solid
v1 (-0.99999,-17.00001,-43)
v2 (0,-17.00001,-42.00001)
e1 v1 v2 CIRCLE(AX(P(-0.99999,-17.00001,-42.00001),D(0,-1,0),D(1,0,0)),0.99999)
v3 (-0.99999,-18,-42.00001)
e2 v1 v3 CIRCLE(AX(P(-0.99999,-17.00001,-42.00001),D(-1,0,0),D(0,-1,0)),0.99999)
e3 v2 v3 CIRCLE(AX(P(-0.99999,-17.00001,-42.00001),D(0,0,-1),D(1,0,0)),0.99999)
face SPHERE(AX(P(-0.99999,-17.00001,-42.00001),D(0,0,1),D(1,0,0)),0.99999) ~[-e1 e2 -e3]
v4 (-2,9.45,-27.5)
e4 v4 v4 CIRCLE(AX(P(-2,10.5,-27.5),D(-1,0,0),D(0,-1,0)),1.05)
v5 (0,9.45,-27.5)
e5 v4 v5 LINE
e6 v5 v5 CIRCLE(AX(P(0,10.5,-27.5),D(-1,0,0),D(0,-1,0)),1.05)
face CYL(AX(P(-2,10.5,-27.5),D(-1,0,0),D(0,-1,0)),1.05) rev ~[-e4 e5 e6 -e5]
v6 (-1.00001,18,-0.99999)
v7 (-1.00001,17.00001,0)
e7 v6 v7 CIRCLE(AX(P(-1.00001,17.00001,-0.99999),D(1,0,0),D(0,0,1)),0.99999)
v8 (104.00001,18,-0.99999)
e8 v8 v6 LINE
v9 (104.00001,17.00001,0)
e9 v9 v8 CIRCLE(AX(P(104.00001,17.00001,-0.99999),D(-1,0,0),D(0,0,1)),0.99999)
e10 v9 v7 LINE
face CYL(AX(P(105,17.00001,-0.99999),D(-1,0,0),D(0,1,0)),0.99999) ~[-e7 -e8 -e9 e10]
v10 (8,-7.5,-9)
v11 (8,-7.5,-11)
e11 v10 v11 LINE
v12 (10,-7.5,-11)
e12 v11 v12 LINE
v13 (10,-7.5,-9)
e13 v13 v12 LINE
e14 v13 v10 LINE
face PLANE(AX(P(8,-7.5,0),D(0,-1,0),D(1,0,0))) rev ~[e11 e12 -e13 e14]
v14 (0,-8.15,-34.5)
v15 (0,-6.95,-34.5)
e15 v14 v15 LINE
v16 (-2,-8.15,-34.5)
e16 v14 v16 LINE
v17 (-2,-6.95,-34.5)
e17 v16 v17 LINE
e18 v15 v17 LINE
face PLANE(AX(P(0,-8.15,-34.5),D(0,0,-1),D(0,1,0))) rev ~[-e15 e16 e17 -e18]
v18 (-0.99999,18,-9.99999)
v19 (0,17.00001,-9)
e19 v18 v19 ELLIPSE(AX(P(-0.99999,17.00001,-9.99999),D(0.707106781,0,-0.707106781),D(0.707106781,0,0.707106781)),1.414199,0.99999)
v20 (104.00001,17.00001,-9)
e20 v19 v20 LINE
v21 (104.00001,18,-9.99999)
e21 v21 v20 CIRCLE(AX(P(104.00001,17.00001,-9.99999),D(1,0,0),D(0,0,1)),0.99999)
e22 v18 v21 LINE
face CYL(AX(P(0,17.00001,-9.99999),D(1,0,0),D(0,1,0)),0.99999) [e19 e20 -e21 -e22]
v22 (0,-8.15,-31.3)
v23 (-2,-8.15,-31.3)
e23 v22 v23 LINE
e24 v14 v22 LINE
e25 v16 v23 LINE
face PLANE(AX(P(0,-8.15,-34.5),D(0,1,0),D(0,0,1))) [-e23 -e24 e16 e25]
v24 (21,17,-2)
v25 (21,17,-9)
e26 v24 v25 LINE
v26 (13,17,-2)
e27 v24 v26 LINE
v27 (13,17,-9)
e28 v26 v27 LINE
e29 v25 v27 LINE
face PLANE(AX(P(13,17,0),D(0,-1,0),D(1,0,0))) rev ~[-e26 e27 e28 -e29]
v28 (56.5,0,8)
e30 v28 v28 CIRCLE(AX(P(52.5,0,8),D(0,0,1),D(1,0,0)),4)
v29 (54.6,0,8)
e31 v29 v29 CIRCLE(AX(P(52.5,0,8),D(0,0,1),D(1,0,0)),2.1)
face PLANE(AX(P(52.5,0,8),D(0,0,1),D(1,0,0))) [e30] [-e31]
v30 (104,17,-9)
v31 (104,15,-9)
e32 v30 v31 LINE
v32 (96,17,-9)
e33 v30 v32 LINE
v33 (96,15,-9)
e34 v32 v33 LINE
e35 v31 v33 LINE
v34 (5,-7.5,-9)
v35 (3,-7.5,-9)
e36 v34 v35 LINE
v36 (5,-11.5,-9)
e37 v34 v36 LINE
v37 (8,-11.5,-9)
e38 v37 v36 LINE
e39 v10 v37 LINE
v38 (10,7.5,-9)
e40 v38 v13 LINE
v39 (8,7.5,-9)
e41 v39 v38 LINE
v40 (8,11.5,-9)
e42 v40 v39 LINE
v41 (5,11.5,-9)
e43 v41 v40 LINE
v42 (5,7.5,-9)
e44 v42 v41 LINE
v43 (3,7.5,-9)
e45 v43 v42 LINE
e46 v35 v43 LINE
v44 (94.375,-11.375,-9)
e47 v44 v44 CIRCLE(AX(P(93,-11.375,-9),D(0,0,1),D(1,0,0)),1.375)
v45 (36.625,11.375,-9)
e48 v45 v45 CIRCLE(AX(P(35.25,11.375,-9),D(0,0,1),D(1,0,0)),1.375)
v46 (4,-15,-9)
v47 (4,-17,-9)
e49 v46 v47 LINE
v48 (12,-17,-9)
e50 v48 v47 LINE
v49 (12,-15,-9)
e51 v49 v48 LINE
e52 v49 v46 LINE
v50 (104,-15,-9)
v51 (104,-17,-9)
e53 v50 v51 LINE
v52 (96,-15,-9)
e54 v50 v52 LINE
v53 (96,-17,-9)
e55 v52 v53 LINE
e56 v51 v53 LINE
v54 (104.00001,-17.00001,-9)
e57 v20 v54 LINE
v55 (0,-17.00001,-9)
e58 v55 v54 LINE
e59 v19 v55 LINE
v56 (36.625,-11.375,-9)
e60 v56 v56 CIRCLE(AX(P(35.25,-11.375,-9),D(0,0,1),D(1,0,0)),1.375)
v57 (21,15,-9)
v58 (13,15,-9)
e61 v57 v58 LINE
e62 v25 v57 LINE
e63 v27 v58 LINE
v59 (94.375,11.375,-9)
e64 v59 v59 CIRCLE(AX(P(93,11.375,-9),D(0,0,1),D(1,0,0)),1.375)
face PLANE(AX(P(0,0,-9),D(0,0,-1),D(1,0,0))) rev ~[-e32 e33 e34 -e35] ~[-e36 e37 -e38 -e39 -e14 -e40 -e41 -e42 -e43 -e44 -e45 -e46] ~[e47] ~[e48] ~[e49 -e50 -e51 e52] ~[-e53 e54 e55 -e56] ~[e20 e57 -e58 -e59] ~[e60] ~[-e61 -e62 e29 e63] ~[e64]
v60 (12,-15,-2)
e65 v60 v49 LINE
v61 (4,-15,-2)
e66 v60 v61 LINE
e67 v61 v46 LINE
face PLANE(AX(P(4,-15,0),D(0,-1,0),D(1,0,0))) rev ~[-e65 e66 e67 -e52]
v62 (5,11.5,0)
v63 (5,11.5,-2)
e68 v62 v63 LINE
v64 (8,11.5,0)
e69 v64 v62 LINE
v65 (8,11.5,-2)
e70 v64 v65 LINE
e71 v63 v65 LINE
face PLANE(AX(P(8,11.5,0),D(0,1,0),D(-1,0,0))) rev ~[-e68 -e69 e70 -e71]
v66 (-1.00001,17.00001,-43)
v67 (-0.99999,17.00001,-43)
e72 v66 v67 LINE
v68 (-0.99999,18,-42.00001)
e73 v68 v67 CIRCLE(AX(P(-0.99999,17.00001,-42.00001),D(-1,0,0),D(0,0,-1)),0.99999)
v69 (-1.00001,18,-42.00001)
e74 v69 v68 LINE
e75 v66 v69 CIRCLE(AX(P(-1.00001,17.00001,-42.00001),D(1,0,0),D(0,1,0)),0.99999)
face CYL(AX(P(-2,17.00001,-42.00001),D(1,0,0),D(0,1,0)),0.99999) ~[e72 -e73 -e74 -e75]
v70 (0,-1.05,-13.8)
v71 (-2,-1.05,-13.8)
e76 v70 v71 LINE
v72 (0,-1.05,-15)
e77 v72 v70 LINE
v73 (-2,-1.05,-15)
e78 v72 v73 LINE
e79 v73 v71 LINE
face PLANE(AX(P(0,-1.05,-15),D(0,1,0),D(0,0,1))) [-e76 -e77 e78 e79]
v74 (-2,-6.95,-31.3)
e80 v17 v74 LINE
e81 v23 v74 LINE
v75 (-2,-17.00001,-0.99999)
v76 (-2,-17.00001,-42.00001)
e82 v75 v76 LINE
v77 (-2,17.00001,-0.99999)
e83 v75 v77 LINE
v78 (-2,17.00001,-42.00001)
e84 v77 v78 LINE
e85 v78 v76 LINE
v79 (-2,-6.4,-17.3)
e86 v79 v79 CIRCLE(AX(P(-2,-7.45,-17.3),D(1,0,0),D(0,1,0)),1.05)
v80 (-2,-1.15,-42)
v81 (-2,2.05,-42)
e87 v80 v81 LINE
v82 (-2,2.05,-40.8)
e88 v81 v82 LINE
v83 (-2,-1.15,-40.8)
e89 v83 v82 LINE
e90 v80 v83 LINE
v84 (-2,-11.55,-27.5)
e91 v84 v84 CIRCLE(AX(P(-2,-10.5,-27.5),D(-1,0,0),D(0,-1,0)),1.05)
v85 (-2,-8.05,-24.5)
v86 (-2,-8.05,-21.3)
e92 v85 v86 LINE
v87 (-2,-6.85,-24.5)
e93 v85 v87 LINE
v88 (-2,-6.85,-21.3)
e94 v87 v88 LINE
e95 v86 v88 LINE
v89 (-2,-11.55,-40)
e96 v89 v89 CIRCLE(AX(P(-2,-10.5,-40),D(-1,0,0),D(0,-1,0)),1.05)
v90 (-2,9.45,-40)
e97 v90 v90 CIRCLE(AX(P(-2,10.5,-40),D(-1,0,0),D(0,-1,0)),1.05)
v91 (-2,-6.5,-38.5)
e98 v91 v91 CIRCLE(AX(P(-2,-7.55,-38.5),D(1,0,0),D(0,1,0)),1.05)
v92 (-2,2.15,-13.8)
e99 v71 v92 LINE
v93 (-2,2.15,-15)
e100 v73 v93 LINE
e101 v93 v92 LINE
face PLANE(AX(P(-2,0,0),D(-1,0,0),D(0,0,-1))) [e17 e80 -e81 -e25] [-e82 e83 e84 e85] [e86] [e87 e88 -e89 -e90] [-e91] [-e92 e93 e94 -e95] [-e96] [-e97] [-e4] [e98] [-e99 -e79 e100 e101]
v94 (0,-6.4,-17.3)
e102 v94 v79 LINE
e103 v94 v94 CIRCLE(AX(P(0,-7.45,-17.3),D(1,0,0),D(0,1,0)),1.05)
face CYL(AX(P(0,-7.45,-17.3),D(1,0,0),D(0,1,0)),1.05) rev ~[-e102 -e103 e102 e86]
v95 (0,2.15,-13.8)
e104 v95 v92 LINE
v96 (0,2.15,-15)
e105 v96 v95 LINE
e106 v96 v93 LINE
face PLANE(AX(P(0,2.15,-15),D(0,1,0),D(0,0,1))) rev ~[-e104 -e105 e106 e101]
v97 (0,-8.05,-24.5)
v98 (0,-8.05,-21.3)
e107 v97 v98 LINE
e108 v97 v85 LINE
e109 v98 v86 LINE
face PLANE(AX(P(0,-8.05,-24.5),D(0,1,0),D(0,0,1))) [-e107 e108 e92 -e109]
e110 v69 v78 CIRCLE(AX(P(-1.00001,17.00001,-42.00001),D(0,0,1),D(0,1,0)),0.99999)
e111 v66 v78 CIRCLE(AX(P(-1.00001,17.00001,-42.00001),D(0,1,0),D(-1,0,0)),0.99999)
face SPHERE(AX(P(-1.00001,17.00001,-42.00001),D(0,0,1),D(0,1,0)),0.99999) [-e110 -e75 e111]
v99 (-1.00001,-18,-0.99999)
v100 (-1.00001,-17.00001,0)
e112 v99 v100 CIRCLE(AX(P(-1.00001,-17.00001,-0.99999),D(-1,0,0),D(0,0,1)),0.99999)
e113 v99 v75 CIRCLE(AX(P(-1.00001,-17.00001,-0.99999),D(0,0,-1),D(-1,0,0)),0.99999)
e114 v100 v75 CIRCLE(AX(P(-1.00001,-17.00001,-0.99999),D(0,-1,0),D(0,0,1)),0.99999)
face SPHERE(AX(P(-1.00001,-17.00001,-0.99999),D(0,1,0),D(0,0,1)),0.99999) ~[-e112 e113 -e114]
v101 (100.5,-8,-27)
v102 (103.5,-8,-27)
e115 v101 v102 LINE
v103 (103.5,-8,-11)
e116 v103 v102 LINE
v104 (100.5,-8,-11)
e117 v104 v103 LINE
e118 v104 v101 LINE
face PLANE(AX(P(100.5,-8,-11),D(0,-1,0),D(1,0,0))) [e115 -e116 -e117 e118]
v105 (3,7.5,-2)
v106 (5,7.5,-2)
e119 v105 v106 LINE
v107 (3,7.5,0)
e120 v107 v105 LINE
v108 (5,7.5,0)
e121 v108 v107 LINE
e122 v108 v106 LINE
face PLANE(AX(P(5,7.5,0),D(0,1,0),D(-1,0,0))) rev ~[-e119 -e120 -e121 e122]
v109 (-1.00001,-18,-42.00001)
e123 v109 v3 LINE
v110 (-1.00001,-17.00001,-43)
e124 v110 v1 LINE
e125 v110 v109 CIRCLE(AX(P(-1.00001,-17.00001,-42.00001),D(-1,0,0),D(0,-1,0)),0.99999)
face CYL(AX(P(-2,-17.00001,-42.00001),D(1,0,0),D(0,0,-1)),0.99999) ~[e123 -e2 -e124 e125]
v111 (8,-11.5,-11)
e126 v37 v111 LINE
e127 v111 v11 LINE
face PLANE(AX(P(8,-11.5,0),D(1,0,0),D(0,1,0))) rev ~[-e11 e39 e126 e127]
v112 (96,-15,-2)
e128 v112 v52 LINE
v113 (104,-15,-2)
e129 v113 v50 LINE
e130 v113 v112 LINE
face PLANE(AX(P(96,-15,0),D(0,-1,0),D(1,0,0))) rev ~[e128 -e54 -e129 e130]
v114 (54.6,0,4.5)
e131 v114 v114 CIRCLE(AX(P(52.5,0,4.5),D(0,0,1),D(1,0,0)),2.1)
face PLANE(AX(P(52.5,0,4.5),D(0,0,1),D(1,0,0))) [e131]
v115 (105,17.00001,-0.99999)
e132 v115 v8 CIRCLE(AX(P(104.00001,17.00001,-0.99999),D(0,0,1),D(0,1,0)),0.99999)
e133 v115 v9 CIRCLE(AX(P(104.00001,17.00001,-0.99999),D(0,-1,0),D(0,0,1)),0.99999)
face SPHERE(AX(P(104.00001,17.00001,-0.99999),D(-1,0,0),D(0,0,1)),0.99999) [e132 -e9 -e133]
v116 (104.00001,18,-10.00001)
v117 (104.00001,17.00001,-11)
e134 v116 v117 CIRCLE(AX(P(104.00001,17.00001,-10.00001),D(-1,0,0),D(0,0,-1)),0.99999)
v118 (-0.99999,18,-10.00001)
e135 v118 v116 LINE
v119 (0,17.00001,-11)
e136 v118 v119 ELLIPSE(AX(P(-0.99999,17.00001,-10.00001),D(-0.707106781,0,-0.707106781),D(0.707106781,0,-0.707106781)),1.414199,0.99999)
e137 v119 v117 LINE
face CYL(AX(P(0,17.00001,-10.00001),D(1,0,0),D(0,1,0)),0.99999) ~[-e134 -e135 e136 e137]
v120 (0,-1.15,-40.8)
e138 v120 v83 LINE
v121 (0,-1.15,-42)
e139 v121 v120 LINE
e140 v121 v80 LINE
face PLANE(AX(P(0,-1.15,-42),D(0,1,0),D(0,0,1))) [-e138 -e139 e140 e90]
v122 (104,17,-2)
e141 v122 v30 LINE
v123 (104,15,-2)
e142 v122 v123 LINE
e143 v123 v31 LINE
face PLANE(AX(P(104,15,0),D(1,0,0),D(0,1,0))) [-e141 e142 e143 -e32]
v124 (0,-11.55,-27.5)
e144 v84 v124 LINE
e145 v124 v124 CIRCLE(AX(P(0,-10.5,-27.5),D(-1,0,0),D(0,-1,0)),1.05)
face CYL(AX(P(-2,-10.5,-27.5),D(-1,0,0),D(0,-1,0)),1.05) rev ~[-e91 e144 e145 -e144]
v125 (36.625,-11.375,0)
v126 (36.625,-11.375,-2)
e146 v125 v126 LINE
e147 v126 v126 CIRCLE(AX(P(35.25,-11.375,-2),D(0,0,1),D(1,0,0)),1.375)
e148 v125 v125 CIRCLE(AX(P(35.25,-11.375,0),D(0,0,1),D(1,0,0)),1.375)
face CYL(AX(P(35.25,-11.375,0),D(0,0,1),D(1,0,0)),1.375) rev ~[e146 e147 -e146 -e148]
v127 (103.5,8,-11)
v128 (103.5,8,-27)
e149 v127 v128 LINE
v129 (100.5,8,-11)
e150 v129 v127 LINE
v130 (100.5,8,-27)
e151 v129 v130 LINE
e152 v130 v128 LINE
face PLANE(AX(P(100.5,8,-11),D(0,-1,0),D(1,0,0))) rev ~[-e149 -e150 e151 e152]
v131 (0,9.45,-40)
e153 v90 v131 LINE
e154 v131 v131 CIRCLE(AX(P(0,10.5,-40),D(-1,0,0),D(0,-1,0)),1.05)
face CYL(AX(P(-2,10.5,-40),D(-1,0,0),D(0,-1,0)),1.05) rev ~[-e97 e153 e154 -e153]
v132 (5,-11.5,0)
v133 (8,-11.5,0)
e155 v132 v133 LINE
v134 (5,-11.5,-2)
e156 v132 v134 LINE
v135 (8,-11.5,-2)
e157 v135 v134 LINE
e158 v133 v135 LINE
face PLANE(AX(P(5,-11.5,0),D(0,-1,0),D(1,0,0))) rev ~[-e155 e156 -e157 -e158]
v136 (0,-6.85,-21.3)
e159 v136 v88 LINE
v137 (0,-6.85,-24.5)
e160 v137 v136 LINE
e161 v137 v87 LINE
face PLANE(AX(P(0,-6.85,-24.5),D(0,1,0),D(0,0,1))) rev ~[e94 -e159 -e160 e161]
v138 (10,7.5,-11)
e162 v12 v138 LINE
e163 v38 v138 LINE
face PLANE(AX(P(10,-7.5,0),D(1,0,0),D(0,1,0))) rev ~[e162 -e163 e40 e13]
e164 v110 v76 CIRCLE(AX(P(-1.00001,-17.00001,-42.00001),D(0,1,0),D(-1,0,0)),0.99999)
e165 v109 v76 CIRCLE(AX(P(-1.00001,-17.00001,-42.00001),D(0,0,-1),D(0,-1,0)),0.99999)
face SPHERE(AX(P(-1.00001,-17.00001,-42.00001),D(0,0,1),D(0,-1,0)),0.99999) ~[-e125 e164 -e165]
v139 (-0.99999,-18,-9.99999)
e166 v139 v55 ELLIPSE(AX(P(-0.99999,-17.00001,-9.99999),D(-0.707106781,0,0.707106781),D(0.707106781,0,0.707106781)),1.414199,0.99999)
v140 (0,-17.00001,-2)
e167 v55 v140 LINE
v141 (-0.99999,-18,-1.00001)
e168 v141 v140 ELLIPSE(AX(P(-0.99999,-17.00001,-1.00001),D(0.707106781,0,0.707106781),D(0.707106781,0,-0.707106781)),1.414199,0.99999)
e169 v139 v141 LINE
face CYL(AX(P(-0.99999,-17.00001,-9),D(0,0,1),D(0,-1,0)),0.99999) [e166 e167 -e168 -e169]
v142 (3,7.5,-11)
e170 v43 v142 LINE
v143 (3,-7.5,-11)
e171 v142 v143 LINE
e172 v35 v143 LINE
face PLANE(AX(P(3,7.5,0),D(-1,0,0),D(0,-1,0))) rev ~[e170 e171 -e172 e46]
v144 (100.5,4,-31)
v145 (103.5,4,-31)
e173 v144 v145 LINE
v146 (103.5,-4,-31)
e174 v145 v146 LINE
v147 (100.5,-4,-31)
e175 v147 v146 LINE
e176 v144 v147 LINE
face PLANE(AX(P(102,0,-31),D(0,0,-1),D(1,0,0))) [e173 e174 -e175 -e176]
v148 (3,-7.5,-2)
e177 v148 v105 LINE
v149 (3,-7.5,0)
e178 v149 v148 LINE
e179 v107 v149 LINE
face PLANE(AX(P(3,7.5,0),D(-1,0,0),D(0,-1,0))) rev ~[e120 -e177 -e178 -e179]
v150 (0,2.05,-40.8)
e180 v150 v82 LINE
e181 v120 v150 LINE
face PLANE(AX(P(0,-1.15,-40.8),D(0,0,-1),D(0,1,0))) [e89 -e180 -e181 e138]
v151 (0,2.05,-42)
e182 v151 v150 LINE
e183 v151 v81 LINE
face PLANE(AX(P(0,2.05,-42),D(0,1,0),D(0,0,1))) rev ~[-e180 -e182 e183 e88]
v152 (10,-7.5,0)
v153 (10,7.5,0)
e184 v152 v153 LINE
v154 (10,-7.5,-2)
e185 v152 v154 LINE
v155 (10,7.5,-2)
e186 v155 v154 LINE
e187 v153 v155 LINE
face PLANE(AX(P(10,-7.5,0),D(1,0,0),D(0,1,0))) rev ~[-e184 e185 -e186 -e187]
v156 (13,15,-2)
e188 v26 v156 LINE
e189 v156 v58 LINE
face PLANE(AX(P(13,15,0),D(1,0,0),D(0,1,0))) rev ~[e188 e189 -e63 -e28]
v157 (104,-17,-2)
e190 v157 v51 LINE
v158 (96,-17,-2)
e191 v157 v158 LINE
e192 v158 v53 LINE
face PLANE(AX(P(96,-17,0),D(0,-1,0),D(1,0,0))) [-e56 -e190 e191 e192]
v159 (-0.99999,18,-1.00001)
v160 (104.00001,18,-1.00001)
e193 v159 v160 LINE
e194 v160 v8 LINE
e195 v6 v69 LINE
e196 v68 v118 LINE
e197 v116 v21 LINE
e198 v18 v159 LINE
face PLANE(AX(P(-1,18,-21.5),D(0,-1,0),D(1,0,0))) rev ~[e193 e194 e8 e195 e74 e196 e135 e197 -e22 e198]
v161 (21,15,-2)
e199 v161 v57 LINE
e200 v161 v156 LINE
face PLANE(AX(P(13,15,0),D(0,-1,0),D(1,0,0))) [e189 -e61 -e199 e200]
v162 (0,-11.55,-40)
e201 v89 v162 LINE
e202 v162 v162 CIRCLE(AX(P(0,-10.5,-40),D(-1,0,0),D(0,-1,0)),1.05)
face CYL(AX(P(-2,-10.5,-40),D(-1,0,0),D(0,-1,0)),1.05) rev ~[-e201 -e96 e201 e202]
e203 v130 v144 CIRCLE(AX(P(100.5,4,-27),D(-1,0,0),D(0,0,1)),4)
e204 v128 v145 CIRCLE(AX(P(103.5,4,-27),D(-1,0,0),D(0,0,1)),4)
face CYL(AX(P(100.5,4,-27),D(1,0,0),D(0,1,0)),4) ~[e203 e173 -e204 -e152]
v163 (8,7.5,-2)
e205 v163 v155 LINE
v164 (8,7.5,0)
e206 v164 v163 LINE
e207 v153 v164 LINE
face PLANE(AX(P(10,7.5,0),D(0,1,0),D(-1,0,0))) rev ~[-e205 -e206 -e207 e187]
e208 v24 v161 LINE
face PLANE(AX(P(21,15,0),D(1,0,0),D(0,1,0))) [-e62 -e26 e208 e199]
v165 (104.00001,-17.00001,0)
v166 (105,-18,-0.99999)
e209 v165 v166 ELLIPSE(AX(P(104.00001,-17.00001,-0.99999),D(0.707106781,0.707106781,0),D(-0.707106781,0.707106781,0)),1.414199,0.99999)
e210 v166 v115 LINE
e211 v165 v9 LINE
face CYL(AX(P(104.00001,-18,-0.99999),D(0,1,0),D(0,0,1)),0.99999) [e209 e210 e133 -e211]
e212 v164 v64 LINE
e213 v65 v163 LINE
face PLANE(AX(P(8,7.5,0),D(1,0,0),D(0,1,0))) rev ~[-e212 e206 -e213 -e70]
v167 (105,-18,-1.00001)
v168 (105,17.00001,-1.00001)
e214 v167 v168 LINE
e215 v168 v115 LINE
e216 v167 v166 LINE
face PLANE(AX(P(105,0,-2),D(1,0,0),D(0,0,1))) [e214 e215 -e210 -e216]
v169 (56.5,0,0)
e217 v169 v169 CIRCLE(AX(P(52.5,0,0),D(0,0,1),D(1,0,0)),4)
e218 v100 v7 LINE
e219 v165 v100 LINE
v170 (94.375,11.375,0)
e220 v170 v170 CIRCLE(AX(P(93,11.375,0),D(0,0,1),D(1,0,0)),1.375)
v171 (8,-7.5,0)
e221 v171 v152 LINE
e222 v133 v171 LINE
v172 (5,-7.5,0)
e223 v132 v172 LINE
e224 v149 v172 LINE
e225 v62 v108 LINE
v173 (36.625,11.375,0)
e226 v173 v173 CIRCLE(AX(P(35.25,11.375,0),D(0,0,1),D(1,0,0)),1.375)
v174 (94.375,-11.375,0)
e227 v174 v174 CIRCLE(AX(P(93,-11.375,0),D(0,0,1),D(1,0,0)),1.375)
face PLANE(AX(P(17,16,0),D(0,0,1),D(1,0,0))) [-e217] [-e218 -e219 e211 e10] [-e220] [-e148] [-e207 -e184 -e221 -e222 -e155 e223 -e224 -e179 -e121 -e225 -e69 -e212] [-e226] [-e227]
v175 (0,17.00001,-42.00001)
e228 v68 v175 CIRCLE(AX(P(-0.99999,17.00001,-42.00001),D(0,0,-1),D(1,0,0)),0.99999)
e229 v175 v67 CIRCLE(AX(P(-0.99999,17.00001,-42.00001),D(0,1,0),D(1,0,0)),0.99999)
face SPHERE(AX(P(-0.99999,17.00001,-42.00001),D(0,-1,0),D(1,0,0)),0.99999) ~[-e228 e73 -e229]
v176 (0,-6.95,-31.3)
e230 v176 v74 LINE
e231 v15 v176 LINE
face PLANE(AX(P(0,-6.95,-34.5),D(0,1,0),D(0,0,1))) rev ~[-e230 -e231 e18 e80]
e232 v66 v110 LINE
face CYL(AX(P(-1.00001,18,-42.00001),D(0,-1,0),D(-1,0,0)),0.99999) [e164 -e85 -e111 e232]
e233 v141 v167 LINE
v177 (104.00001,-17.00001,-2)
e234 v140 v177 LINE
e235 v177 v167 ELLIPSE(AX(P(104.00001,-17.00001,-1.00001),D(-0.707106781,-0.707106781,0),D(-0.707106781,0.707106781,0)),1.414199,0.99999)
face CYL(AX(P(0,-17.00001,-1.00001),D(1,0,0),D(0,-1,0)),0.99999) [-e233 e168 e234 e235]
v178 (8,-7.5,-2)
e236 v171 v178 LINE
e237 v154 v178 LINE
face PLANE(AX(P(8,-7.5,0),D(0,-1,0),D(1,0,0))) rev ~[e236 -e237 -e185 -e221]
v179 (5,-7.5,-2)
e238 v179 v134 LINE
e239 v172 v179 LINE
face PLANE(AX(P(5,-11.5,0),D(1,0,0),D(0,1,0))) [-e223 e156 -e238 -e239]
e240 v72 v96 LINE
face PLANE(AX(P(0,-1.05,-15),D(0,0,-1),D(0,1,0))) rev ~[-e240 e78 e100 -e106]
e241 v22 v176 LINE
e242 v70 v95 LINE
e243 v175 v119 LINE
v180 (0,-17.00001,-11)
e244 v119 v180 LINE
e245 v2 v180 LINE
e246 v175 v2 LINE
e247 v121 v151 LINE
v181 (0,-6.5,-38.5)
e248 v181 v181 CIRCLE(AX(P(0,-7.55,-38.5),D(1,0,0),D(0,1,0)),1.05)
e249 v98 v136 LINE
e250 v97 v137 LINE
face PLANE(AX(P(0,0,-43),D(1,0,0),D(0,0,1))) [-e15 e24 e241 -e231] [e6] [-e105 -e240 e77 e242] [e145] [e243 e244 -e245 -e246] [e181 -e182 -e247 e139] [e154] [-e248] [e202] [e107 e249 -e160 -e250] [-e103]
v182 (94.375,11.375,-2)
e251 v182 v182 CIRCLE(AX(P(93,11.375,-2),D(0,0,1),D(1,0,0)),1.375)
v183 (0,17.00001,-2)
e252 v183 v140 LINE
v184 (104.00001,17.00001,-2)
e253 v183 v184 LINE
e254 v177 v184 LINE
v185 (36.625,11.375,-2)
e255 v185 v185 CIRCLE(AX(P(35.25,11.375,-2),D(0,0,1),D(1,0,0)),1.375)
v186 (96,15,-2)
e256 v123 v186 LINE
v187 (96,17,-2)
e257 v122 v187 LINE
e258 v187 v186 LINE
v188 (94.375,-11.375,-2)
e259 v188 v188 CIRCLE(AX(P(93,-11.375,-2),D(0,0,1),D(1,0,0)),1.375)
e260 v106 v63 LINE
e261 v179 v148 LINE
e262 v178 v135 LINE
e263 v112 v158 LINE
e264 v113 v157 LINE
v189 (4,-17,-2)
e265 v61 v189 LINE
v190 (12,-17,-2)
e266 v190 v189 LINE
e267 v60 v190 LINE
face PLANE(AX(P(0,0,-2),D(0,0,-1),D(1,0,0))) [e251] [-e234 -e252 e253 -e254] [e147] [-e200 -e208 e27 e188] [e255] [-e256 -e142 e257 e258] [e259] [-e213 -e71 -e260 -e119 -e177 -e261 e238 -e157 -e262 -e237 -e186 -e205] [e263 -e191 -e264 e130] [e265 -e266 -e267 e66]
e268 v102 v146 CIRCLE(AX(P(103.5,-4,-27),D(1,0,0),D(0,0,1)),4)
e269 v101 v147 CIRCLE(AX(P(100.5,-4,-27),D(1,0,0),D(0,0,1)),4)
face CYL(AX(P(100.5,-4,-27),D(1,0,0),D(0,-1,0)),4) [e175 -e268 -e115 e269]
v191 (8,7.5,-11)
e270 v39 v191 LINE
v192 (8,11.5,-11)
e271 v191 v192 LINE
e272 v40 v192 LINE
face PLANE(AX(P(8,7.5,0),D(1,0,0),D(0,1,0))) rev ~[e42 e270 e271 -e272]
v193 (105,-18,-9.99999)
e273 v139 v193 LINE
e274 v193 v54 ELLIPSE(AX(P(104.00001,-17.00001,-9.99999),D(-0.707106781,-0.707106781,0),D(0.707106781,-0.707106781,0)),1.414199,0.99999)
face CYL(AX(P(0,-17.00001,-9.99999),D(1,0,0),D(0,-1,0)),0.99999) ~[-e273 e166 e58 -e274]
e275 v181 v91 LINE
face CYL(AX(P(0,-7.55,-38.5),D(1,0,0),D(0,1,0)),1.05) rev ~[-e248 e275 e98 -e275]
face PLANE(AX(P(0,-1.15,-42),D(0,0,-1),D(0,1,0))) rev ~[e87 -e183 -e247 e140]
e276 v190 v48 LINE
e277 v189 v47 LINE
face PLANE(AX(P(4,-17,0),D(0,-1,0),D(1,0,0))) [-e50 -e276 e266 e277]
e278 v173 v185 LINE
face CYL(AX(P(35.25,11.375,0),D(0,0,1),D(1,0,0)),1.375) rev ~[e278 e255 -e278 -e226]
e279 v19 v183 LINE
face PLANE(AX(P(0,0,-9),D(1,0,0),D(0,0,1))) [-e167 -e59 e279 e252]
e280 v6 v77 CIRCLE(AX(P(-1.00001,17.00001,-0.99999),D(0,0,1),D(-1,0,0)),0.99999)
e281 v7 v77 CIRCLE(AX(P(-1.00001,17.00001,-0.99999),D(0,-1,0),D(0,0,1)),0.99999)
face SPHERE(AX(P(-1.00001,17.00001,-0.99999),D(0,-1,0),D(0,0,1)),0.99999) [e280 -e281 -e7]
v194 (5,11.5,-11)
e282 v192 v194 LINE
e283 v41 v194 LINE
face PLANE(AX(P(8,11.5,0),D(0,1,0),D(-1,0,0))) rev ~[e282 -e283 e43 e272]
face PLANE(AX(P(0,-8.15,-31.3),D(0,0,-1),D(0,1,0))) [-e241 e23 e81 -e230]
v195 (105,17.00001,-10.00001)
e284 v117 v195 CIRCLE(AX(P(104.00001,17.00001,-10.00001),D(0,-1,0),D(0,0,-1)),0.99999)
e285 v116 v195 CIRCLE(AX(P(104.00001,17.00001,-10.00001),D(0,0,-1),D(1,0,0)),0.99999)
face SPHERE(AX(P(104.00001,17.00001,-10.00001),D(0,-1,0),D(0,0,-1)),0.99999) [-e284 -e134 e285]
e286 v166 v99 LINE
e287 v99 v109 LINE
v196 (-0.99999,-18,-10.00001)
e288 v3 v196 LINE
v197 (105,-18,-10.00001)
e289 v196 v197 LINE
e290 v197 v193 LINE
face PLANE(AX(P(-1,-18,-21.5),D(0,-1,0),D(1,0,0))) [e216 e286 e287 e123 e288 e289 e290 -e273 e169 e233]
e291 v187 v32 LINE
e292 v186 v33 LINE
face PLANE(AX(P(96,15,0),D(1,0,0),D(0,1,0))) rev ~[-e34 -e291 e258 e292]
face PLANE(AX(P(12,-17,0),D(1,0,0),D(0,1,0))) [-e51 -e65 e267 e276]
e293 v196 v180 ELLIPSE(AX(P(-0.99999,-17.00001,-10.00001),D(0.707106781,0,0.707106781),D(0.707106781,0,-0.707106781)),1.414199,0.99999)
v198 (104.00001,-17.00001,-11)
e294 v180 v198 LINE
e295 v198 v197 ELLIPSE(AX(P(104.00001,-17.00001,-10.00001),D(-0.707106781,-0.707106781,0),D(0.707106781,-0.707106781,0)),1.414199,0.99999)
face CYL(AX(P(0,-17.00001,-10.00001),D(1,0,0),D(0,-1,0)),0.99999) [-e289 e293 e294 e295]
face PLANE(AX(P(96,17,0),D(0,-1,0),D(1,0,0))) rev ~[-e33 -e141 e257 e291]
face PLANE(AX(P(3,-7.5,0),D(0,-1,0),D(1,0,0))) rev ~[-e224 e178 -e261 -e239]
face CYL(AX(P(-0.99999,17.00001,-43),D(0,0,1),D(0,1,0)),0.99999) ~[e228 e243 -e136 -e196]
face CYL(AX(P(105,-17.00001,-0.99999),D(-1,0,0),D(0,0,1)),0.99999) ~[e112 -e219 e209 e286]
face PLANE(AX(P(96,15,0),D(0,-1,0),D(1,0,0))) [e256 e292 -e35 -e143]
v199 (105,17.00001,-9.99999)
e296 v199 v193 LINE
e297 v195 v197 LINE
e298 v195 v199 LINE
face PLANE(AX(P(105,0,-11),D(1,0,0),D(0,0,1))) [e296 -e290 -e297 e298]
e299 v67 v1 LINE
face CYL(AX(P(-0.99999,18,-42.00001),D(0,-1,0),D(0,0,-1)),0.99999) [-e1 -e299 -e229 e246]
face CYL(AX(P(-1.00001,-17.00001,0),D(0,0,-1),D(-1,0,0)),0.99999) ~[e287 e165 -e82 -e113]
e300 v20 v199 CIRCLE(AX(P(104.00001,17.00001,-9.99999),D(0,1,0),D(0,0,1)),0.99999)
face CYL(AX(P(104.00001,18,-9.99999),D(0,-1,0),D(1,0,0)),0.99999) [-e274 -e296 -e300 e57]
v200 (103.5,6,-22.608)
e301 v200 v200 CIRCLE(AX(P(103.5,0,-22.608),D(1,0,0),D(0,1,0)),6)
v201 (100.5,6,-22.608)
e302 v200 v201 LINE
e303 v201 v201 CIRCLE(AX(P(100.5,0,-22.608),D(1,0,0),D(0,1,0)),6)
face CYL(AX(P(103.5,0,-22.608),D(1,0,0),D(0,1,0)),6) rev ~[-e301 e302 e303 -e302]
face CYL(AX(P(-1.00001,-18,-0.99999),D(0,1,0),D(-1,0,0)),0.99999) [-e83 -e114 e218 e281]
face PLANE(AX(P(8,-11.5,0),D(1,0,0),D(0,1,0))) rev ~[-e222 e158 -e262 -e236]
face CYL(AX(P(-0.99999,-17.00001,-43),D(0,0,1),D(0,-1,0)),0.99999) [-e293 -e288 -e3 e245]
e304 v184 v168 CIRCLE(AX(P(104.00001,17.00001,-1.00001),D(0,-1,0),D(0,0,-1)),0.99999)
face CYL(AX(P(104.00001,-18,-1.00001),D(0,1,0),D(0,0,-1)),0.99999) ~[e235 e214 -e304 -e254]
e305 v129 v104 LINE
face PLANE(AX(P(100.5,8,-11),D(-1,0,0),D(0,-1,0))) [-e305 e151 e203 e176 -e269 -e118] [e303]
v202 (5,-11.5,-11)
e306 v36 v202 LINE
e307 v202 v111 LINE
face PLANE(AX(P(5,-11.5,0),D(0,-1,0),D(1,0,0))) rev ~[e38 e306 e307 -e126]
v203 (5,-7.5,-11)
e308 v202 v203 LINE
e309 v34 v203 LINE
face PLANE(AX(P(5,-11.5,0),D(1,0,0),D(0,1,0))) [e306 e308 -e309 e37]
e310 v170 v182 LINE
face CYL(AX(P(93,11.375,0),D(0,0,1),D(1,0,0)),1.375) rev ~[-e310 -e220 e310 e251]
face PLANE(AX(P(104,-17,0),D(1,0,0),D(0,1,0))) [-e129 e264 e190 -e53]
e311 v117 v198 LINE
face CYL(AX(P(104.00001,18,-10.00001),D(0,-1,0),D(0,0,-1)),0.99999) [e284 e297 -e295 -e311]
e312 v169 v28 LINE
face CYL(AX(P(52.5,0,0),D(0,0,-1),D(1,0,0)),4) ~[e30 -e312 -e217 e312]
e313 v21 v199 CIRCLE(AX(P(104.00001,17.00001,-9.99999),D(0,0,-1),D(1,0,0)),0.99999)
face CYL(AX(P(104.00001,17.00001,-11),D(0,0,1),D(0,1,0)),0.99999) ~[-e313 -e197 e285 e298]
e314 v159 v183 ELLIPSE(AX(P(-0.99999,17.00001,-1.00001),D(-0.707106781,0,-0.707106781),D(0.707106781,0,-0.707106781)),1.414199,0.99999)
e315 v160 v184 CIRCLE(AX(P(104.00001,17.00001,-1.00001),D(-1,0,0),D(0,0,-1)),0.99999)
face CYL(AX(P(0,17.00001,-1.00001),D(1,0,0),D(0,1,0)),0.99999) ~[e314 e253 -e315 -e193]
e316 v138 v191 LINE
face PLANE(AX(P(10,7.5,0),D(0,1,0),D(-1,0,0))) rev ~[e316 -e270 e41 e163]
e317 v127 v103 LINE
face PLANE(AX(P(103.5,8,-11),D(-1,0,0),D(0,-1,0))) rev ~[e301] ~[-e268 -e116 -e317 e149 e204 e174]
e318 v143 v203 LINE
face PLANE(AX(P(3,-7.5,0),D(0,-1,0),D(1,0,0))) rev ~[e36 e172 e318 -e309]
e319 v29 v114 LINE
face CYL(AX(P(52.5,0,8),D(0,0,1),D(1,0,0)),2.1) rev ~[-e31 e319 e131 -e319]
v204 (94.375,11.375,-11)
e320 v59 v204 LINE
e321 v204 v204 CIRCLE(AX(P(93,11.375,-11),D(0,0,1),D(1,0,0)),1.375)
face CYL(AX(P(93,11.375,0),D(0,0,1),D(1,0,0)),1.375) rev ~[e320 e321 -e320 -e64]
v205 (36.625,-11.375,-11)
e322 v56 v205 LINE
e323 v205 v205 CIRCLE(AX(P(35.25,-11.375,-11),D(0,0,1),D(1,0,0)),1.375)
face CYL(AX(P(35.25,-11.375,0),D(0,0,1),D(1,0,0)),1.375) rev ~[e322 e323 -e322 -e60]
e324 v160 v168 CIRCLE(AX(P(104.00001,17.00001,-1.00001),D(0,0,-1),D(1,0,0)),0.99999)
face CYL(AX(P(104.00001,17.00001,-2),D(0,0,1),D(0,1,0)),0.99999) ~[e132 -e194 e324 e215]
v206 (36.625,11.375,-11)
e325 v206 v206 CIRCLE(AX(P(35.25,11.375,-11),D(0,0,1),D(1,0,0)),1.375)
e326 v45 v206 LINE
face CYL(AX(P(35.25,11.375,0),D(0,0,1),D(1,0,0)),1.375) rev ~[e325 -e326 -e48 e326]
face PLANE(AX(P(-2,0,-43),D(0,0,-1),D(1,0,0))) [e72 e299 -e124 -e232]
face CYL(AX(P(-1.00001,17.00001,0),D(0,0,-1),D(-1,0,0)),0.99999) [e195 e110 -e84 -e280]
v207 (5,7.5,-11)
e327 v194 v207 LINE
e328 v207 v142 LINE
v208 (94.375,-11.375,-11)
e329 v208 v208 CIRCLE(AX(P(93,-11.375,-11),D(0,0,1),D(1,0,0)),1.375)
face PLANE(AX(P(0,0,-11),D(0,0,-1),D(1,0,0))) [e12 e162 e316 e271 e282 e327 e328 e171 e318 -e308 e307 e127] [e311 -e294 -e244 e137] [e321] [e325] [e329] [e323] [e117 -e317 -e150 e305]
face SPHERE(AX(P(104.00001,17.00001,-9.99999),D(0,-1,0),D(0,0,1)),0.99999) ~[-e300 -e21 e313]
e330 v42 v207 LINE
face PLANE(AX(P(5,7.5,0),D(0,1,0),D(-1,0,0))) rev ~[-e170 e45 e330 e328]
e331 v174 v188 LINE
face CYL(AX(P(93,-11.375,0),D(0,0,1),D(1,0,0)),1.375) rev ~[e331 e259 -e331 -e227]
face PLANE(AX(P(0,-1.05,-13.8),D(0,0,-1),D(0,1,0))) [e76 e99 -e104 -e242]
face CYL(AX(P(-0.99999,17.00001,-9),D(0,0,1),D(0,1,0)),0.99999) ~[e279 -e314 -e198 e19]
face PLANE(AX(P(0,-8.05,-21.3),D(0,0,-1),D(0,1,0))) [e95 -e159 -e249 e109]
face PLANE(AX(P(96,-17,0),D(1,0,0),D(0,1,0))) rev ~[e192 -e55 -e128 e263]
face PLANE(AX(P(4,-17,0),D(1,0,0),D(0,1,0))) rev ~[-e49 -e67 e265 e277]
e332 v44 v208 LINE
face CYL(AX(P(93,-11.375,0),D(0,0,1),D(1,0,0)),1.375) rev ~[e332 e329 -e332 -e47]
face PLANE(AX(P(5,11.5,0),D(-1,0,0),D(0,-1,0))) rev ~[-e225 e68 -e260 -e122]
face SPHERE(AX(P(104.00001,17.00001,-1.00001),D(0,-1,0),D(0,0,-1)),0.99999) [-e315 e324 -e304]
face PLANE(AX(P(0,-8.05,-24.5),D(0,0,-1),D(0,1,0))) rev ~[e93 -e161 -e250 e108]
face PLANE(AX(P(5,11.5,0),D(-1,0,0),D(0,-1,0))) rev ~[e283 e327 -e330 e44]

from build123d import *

# Parameters (mm, degrees)
F0_W      = 105
F0_H      = 2
F1_DEPTH  = 18
F2_R      = 4
F3_DEPTH  = 8
F4_R      = 2.1
F5_DEPTH  = 3.5
F6_R      = 1.05
F7_DEPTH  = 2
F8_R      = 1.375
F9_DEPTH  = 11
F10_W     = 3
F10_H     = 4
F11_DEPTH = 11
F12_R     = 0.99999
F13_W     = 3
F13_H     = 16
F14_DEPTH = 20
F15_R     = 4
F16_R     = 6
F17_DEPTH = 3
F18_W     = 1.2
F18_H     = 3.2
F18_W_2   = 3.2
F18_H_2   = 1.2
F18_R     = 1.05
F19_DEPTH = 2
F20_W     = 8
F20_H     = 2
F21_DEPTH = 11


# Not quite as in the source:
# - a fillet or chamfer is up to 0.001 mm smaller than in the source, because OpenCascade refuses the exact size


with BuildPart() as f1:
    # F0 (on Front) → F1 (new body, symmetric)
    with BuildSketch(Plane.XZ):
        Polygon((0, -2), (0, 0), (-2, 0), (-2, -43), (0, -43), (0, -11), (0, -9), align=None)
        with Locations((52.5, -1)):
            Rectangle(F0_W, F0_H)
        with Locations((52.5, -10)):
            Rectangle(F0_W, F0_H)
    extrude(amount=F1_DEPTH, both=True)

    # F2 (on face) → F3 (join)
    with BuildSketch(Plane.XY):
        with Locations((52.5, 0)):
            Circle(F2_R)
    extrude(amount=F3_DEPTH)

    # F4 (on face) → F5 (cut)
    with BuildSketch(Plane.XY.offset(8)):
        with Locations((52.5, 0)):
            Circle(F4_R)
    extrude(amount=-F5_DEPTH, mode=Mode.SUBTRACT)

    # F6 (on face) → F7 (cut, through all)
    with BuildSketch(Plane(origin=(-2, 0, 0), x_dir=(0, -1, 0), z_dir=(-1, 0, 0))):
        with Locations((-10.5, -40)):
            Circle(F6_R)
        with Locations((10.5, -40)):
            Circle(F6_R)
        with Locations((-10.5, -27.5)):
            Circle(F6_R)
        with Locations((10.5, -27.5)):
            Circle(F6_R)
    extrude(amount=-F7_DEPTH, mode=Mode.SUBTRACT)

    # F8 (on face) → F9 (cut, through all)
    with BuildSketch(Plane.XY):
        with Locations((35.25, 11.375)):
            Circle(F8_R)
        with Locations((35.25, -11.375)):
            Circle(F8_R)
        with Locations((93, 11.375)):
            Circle(F8_R)
        with Locations((93, -11.375)):
            Circle(F8_R)
    extrude(amount=-F9_DEPTH, mode=Mode.SUBTRACT)

    # F10 (on face) → F11 (cut, through all)
    with BuildSketch(Plane.XY):
        Polygon((5, 7.5), (3, 7.5), (3, -7.5), (5, -7.5), (8, -7.5), (10, -7.5), (10, 7.5), (8, 7.5), (6.5, 7.5), align=None)
        Polygon((5, 11.5), (5, 7.5), (6.5, 7.5), (8, 7.5), (8, 11.5), align=None)
        with Locations((6.5, -9.5)):
            Rectangle(F10_W, F10_H)
    extrude(amount=-F11_DEPTH, mode=Mode.SUBTRACT)

    # F12 (radius 1 in the source; OpenCascade refuses exactly that, so slightly less here)
    f12_edges = [f1.edges().sort_by_distance(p)[0] for p in [
        (-2, 0, 0),
        (51.5, -18, 0),
        (51.5, 18, 0),
        (105, 0, 0),
        (105, 0, -2),
        (105, 0, -9),
        (105, 0, -11),
        (52.5, -18, -9),
        (52.5, -18, -11),
        (52.5, -18, -2),
        (0, -18, -27),
        (-2, -18, -21.5),
        (0, 0, -43),
        (-1, -18, -43),
        (52.5, 18, -2),
        (52.5, 18, -9),
        (52.5, 18, -11),
        (105, 18, -1),
        (105, 18, -10),
        (0, 18, -27),
        (0, 18, -5.5),
        (-2, 18, -21.5),
        (-1, 18, -43),
        (-2, 0, -43),
        (0, -18, -5.5),
    ]]
    fillet(f12_edges, radius=F12_R)

    # F13 (on face) → F14 (join)
    with BuildSketch(Plane(origin=(0, 0, -11), x_dir=(1, 0, 0), z_dir=(0, 0, -1))):
        with Locations((102, 0)):
            Rectangle(F13_W, F13_H)
    extrude(amount=F14_DEPTH)

    # F15
    f15_edges = [f1.edges().sort_by_distance(p)[0] for p in [
        (102, -8, -31),
        (102, 8, -31),
    ]]
    fillet(f15_edges, radius=F15_R)

    # F16 (on face) → F17 (cut, through all)
    with BuildSketch(Plane.YZ.offset(103.5)):
        with Locations((0, -22.608)):
            Circle(F16_R)
    extrude(amount=-F17_DEPTH, mode=Mode.SUBTRACT)

    # F18 (on face) → F19 (cut, through all)
    with BuildSketch(Plane.YZ):
        with Locations((-7.45, -22.9)):
            Rectangle(F18_W, F18_H)
        with Locations((-7.55, -32.9)):
            Rectangle(F18_W, F18_H)
        with Locations((0.45, -41.4)):
            Rectangle(F18_W_2, F18_H_2)
        with Locations((0.55, -14.4)):
            Rectangle(F18_W_2, F18_H_2)
        with Locations((-7.45, -17.3)):
            Circle(F18_R)
        with Locations((-7.55, -38.5)):
            Circle(F18_R)
    extrude(amount=-F19_DEPTH, mode=Mode.SUBTRACT)

    # F20 (on face) → F21 (join, through all)
    with BuildSketch(Plane.XY):
        with Locations((17, 16)):
            Rectangle(F20_W, F20_H)
        with Locations((100, 16)):
            Rectangle(F20_W, F20_H)
        with Locations((100, -16)):
            Rectangle(F20_W, F20_H)
        with Locations((8, -16)):
            Rectangle(F20_W, F20_H)
    extrude(amount=-F21_DEPTH)


solid = f1.part
